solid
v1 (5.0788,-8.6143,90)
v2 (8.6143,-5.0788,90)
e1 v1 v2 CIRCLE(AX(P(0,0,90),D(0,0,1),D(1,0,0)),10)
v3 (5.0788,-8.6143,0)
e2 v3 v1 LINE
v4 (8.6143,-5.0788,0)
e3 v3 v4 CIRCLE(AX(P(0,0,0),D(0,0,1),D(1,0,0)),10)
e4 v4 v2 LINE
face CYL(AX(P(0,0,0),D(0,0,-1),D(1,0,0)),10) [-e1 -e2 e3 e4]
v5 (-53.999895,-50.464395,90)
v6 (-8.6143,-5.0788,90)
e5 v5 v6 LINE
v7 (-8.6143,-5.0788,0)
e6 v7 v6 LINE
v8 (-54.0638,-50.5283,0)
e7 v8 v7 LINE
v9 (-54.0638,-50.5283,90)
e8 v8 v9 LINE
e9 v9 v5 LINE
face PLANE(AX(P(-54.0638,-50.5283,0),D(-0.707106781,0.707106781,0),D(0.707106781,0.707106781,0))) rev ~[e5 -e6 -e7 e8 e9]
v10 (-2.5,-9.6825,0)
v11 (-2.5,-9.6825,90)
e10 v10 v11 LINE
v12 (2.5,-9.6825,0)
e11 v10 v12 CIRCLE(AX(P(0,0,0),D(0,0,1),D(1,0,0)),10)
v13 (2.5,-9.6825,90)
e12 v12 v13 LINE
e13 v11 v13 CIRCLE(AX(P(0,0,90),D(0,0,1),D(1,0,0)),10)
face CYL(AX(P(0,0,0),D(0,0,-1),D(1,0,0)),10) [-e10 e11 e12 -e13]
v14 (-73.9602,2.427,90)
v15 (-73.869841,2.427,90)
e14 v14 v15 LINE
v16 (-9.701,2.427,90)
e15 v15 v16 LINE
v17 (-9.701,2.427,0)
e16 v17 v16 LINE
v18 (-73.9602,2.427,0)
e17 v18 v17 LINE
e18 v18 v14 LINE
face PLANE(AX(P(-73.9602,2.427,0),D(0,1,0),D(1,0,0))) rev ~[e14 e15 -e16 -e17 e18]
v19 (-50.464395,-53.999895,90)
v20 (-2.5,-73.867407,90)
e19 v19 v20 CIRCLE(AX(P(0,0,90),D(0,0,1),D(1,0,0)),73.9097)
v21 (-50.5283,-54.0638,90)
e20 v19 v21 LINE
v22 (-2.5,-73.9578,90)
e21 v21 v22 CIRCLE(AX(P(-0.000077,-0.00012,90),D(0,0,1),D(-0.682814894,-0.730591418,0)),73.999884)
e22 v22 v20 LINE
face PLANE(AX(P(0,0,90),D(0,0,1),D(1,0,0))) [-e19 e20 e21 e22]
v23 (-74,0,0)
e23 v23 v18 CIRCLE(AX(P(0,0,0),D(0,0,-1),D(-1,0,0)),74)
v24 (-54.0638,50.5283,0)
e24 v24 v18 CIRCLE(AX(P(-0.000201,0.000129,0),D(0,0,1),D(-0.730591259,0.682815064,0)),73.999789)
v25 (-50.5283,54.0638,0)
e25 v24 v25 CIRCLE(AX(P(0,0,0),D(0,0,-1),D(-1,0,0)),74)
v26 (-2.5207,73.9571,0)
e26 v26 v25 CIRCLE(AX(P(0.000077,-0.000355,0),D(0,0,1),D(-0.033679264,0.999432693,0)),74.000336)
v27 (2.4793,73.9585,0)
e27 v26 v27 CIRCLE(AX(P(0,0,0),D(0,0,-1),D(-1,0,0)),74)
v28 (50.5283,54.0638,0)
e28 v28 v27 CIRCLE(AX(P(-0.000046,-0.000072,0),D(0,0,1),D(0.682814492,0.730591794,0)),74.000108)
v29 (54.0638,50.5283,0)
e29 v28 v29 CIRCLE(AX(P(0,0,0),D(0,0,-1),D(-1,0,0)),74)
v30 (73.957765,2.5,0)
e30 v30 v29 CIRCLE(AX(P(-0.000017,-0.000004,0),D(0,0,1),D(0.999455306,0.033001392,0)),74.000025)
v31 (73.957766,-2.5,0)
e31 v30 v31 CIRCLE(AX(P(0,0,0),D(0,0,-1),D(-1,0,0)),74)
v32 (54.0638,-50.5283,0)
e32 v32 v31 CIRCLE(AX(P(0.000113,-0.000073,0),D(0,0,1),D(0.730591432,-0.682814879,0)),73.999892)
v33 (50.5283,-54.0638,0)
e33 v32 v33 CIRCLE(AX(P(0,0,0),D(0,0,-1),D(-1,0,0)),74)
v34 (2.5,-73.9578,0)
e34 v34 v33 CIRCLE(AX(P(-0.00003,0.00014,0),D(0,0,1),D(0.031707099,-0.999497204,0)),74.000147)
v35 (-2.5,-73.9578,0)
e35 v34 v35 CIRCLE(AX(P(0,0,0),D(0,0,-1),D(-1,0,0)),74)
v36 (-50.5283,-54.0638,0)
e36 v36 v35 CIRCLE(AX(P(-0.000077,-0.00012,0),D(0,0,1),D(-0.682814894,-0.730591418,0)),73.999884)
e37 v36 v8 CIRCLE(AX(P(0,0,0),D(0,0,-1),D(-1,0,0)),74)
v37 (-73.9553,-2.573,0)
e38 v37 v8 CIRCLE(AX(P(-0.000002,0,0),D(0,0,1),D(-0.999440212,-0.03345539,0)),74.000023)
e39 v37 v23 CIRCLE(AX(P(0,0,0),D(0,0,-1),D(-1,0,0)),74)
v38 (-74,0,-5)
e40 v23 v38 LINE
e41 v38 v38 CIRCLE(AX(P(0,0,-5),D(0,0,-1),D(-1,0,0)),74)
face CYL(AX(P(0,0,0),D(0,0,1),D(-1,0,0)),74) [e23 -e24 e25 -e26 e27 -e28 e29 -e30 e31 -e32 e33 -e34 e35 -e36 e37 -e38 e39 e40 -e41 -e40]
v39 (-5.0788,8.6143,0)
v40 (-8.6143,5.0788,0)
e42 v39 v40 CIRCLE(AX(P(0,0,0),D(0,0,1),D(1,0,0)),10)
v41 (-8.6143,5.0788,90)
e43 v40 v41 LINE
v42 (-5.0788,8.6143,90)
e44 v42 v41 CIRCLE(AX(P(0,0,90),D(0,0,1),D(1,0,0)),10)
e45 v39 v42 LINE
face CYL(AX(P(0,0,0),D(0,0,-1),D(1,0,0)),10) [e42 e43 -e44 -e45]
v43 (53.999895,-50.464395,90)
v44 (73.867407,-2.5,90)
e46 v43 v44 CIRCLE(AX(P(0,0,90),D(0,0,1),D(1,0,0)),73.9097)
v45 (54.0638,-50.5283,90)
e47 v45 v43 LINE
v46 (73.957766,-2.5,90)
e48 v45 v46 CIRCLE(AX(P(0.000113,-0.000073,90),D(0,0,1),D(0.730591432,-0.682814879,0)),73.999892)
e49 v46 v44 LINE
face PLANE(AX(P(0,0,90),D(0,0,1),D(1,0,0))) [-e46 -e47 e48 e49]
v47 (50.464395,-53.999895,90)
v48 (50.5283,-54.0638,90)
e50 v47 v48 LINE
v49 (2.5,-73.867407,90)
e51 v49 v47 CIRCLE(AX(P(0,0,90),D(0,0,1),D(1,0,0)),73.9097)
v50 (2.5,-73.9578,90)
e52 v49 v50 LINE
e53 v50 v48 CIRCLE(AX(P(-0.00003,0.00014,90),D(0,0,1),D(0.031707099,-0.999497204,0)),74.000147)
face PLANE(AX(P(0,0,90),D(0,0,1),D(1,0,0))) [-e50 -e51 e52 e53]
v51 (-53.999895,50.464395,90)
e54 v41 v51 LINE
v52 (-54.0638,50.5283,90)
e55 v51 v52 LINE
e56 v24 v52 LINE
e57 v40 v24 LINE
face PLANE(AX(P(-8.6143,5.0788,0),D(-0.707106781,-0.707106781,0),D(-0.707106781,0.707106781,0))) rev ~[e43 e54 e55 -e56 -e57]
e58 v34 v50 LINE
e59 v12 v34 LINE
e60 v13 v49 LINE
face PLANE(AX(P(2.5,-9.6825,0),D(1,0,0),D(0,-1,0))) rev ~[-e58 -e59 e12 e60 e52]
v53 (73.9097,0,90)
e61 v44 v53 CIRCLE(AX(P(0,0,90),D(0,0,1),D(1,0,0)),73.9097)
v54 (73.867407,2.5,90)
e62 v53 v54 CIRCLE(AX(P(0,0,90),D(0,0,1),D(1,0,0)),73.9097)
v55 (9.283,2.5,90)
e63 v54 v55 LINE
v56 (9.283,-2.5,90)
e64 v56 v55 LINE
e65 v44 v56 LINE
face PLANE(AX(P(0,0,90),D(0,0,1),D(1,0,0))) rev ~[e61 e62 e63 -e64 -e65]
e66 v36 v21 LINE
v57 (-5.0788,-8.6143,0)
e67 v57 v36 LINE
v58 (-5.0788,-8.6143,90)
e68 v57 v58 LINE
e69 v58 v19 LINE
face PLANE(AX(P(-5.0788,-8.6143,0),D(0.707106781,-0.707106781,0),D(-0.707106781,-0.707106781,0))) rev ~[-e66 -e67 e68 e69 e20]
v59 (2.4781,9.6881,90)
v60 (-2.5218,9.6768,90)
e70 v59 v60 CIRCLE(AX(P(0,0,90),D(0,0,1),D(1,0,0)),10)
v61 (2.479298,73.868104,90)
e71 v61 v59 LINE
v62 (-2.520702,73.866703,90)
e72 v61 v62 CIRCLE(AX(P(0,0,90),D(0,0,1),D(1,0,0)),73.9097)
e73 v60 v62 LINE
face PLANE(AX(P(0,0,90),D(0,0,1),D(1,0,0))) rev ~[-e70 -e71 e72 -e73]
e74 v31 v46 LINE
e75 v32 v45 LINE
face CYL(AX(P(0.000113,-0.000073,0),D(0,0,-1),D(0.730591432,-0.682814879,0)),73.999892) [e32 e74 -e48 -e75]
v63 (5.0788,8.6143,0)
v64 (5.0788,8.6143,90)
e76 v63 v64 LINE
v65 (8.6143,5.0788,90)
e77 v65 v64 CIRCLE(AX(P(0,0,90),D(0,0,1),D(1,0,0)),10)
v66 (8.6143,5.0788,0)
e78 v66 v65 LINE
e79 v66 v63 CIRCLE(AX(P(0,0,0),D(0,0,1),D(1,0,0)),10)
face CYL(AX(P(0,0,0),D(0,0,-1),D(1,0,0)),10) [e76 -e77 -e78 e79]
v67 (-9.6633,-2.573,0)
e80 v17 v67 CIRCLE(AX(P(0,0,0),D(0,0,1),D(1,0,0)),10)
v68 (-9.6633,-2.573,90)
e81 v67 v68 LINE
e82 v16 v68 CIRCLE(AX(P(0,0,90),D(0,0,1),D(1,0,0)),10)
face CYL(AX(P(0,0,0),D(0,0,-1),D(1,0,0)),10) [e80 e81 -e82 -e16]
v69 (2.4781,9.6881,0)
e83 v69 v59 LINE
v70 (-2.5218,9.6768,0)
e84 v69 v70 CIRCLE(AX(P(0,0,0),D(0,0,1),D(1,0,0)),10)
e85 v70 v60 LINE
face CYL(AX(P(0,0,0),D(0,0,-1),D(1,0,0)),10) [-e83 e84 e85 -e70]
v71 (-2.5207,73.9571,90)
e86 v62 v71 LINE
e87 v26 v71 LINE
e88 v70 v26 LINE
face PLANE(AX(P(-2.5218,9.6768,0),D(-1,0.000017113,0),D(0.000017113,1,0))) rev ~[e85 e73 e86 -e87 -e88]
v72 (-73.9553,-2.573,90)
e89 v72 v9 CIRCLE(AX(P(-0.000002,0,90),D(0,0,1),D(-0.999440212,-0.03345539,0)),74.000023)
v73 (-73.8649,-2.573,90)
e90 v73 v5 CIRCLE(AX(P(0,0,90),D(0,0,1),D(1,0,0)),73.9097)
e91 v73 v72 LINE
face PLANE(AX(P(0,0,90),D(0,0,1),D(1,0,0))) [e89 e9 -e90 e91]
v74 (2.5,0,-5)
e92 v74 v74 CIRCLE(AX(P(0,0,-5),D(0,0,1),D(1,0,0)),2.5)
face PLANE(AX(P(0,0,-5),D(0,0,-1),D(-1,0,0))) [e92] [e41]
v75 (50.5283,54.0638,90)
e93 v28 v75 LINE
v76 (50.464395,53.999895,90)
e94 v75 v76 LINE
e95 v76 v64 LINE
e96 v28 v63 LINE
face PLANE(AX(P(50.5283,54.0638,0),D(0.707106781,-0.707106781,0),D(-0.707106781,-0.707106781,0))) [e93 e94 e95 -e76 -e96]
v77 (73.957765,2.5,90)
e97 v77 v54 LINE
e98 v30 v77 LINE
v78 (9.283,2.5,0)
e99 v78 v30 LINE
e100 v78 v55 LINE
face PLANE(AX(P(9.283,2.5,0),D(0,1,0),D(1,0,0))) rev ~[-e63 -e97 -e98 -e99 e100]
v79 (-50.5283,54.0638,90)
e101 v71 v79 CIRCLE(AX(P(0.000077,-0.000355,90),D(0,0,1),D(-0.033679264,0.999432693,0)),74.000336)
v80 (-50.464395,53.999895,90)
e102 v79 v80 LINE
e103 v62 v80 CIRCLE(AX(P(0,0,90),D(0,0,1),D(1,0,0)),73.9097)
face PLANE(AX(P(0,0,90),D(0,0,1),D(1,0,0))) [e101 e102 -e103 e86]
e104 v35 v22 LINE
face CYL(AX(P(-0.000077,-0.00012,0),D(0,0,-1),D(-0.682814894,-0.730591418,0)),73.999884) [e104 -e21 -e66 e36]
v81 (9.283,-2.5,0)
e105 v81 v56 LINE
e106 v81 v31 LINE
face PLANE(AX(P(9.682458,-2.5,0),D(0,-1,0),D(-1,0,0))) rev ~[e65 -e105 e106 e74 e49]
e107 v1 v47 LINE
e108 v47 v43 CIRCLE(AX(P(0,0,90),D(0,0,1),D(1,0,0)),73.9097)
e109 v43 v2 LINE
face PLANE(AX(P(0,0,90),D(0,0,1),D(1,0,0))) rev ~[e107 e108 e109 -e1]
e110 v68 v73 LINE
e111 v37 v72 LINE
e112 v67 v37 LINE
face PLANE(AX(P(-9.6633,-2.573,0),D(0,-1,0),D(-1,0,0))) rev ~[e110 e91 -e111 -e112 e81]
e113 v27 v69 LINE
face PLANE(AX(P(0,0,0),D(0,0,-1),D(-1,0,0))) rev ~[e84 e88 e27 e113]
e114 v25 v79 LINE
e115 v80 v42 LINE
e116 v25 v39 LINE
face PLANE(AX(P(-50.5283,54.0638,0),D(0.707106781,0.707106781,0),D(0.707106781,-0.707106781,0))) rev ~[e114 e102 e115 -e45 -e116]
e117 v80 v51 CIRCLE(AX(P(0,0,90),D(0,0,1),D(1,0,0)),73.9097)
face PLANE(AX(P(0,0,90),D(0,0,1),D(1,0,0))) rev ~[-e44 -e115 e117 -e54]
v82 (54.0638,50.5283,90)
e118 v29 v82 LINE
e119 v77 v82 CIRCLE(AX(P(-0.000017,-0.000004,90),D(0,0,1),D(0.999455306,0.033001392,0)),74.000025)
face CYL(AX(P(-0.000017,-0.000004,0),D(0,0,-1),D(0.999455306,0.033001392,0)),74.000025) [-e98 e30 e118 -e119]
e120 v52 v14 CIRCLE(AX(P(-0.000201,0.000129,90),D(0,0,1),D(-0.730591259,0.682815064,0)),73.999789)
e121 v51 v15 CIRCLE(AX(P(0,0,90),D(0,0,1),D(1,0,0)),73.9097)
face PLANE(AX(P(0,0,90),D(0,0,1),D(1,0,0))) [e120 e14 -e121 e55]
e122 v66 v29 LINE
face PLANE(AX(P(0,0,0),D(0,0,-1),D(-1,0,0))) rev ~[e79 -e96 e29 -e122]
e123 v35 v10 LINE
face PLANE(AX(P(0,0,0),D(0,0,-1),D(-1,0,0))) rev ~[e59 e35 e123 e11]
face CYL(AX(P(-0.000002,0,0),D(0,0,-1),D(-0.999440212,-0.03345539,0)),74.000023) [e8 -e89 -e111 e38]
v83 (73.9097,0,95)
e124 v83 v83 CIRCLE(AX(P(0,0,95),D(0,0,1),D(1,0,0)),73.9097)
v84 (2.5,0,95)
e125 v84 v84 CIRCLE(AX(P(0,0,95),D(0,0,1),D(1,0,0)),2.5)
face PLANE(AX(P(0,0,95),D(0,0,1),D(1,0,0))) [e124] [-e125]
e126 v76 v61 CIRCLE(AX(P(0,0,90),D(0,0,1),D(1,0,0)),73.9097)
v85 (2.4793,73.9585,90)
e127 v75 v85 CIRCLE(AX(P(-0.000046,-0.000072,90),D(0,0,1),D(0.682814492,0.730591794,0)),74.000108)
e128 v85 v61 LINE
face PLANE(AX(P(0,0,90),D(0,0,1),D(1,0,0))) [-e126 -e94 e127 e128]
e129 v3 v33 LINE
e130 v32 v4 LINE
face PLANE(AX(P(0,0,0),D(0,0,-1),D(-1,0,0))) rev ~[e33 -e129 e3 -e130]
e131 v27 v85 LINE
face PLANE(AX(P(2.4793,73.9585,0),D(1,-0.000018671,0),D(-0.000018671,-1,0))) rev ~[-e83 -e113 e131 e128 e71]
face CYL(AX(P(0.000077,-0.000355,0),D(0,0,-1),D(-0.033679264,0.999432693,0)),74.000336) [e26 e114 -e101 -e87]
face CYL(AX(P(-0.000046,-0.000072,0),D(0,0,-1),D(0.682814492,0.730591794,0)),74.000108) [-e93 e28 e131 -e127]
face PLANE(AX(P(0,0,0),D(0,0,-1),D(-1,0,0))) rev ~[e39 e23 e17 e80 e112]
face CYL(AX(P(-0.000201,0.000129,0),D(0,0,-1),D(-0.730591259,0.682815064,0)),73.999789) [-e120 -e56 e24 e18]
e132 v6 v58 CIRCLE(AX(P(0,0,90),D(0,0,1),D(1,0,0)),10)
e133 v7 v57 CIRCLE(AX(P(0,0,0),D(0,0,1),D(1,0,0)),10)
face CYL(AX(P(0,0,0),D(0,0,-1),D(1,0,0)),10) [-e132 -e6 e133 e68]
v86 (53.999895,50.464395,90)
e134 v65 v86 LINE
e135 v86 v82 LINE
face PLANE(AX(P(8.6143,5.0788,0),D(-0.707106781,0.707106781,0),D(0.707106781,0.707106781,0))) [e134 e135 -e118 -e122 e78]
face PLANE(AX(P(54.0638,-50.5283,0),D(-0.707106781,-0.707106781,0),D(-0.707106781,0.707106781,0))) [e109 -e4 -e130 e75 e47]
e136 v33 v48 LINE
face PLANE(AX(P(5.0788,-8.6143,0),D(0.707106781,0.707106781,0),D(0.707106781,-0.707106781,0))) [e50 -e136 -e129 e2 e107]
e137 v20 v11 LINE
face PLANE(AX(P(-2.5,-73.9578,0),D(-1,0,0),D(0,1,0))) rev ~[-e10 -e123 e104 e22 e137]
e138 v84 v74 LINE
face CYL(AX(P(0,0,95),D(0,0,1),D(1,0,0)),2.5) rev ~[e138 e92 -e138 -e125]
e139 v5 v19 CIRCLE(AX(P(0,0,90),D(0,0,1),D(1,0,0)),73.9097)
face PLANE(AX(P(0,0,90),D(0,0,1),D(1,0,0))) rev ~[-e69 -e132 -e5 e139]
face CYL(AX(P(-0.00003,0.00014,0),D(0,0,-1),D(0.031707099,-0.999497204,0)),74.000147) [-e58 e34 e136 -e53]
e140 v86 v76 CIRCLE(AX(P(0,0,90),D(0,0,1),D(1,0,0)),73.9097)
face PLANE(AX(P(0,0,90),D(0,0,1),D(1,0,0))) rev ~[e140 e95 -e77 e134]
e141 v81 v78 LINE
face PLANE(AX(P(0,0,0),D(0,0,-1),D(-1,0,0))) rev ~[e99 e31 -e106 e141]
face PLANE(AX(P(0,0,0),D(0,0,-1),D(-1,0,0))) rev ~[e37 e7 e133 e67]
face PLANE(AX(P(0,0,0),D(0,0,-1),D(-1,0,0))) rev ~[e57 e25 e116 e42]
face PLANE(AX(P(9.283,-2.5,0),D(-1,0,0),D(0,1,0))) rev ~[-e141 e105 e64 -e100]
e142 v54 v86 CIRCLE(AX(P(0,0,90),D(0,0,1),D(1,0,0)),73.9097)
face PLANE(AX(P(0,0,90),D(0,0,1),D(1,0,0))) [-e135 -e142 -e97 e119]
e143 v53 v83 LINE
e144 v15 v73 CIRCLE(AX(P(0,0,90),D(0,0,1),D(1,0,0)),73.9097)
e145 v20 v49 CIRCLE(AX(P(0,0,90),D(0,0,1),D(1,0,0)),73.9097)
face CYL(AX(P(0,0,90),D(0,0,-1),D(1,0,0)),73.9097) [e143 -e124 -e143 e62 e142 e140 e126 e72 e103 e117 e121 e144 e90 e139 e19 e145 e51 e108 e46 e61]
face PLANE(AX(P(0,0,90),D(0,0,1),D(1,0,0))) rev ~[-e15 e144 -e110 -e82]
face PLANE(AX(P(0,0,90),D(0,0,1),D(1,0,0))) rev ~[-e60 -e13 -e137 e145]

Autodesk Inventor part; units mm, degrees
ref_plane "YZ Plane" through (0, 0, 0) normal (1, 0, 0) x (0, 1, 0)
ref_plane "XZ Plane" through (0, 0, 0) normal (0, 1, 0) x (-1, 0, 0)
ref_plane "XY Plane" through (0, 0, 0) normal (0, 0, 1) x (1, 0, 0)
sketch "Sketch1" plane through (0, 0, 0) normal (0, 0, 1) x (1, 0, 0)
  point P0 (0, 0)
sketch "Sketch2" plane through (0, 0, 0) normal (0, 0, 1) x (1, 0, 0)
  circle A0 centre (0, 0) radius 10
  line L0 (2.4793, 73.9585) -> (2.4781, 9.6881)
  line L1 (-2.5359, 9.6731) -> (-2.5218, 9.6731)
  line L2 (-2.5218, 9.6768) -> (-2.5207, 73.9571)
  line L3 (-2.4922, 73.958) -> (2.4781, 9.6881) construction
  line L4 (2.4804, 74.3269) -> (-2.5218, 9.6731) construction
  line L5 (-2.5218, 9.6731) -> (-2.5218, 9.6723)
  line L6 (9.283, 2.5) -> (74.717, 2.5)
  line L7 (74.717, 2.5) -> (74.717, -2.5)
  line L8 (74.717, -2.5) -> (9.283, -2.5)
  line L9 (9.283, -2.5) -> (9.283, 2.5)
  line L10 (9.283, 2.5) -> (74.717, -2.5) construction
  line L11 (74.717, 2.5) -> (9.283, -2.5) construction
  line L12 (2.4778, -7.9438) -> (2.5, -7.9438)
  line L13 (2.5, -9.6825) -> (2.5, -73.9578)
  line L14 (2.5, -76.0562) -> (2.4766, -76.0562)
  line L15 (-2.5, -73.9578) -> (-2.5, -9.6825)
  line L16 (-2.5, -7.9438) -> (2.5, -76.0562) construction
  line L17 (2.5, -7.9438) -> (-2.5, -76.0562) construction
  line L18 (-73.9602, 2.427) -> (-9.701, 2.427)
  line L19 (-8.7479, -2.5) -> (-8.7479, -2.573)
  line L20 (-9.6633, -2.573) -> (-73.9553, -2.573)
  line L21 (-75.2519, -2.573) -> (-75.2519, -2.5)
  line L22 (-75.2519, 2.427) -> (-8.7479, -2.573) construction
  line L23 (-8.7479, 2.427) -> (-75.2519, -2.573) construction
  line L24 (50.5283, 54.0638) -> (5.0788, 8.6143)
  line L25 (-1.7678, 1.7678) -> (1.7678, -1.7678)
  line L26 (8.6143, 5.0788) -> (54.0638, 50.5283)
  line L27 (53.4417, 51.1858) -> (5.5504, 8.3182) construction
  line L28 (39.6303, -7.8699) -> (34.6303, 82.4585) construction
  line L29 (-54.0638, -50.5283) -> (-8.6143, -5.0788)
  line L30 (-1.7678, 1.7678) -> (1.7678, -1.7678)
  line L31 (-5.0788, -8.6143) -> (-50.5283, -54.0638)
  line L32 (-51.9756, -52.6739) -> (-8.4008, -5.4246) construction
  line L33 (-52.6739, -51.9756) -> (-5.4246, -8.4008) construction
  arc A1 (73.9597, 2.4421) -> (53.4417, 51.1858) centre (0, 0) ccw
  arc A2 (50.5283, 54.0638) -> (2.452, 73.9594) centre (0, 0) ccw
  arc A3 (-73.9586, -2.4757) -> (-54.0638, -50.5283) centre (0, 0) ccw
  arc A4 (-50.5283, -54.0638) -> (-2.3463, -73.9628) centre (0, 0) ccw
  line L34 (-50.5283, 54.0638) -> (-5.0788, 8.6143)
  line L35 (1.7678, 1.7678) -> (0, 0)
  line L36 (-8.6143, 5.0788) -> (-54.0638, 50.5283)
  line L37 (-84.1138, 80.5783) -> (-5.4456, 8.3872) construction
  line L38 (-80.5783, 84.1138) -> (-1.7678, -1.7678) construction
  arc A5 (-2.4922, 73.958) -> (-50.5283, 54.0638) centre (0, 0) ccw
  arc A6 (-54.0638, 50.5283) -> (-73.9633, 2.3301) centre (0, 0) ccw
  line L39 (5.0788, -8.6143) -> (50.5283, -54.0638)
  line L40 (79.0888, -76.0562) -> (79.3403, -75.8047)
  line L41 (54.0638, -50.5283) -> (8.6143, -5.0788)
  line L42 (1.7678, 1.7678) -> (75.8047, -79.3403) construction
  line L43 (-1.7678, -1.7678) -> (79.3403, -75.8047) construction
  arc A7 (2.3463, -73.9628) -> (50.5283, -54.0638) centre (0, 0) ccw
  arc A8 (54.0638, -50.5283) -> (73.9597, -2.4421) centre (0, 0) ccw
  point P0 (-0.0207, 42)
  point P1 (-0.0207, 74.3122)
  point P2 (42, 0)
  point P3 (0, -42)
  point P4 (-41.9999, -0.073)
  point P5 (37.1303, 37.2943)
  point P6 (-43.6953, -43.6953)
  point P7 (-41.173, 41.173)
  point P8 (38.7862, -38.7862)
  point P9 (73.9578, -2.5)
  point P10 (73.9578, 2.5)
  dimension "d1" = 20
  dimension "d3" = 5
  dimension "d4" = 65.434
  dimension "d5" = 5
  dimension "d6" = 5
  dimension "d7" = 66.504
  dimension "d8" = 5
  dimension "d9" = 5
  dimension "d10" = 5
  dimension "d11" = 5
  dimension "d12" = 5
extrude "Extrusion1" add sketch "Sketch2" along normal blind 90 contours A0 L6 L9 L8 | L26 A1 L6 A0 | A0 L0 A2 L24 | A0 L34 A5 L2 | L8 A8 L41 A0 | L39 A7 L13 A0 | A0 L18 A6 L36 | L15 A4 L31 A0 | A0 L29 A3 L20 picked at (2.8651, 0.2554)
sketch "Sketch3" plane through (0, 0, 0) normal (0, 0, -1) x (-1, 0, 0)
  circle A0 centre (0, 0) radius 74
extrude "Extrusion2" add sketch "Sketch3" along normal blind 5
sketch "Sketch4" plane through (0, 0, 90) normal (0, 0, 1) x (1, 0, 0)
  circle A0 centre (0, 0) radius 73.9097
extrude "Extrusion3" add sketch "Sketch4" along normal blind 5
sketch "Sketch5" plane through (0, 0, 95) normal (0, 0, 1) x (1, 0, 0)
  circle A0 centre (0, 0) radius 2.5
  dimension "d19" = 5
extrude "Extrusion4" cut sketch "Sketch5" against normal through all
